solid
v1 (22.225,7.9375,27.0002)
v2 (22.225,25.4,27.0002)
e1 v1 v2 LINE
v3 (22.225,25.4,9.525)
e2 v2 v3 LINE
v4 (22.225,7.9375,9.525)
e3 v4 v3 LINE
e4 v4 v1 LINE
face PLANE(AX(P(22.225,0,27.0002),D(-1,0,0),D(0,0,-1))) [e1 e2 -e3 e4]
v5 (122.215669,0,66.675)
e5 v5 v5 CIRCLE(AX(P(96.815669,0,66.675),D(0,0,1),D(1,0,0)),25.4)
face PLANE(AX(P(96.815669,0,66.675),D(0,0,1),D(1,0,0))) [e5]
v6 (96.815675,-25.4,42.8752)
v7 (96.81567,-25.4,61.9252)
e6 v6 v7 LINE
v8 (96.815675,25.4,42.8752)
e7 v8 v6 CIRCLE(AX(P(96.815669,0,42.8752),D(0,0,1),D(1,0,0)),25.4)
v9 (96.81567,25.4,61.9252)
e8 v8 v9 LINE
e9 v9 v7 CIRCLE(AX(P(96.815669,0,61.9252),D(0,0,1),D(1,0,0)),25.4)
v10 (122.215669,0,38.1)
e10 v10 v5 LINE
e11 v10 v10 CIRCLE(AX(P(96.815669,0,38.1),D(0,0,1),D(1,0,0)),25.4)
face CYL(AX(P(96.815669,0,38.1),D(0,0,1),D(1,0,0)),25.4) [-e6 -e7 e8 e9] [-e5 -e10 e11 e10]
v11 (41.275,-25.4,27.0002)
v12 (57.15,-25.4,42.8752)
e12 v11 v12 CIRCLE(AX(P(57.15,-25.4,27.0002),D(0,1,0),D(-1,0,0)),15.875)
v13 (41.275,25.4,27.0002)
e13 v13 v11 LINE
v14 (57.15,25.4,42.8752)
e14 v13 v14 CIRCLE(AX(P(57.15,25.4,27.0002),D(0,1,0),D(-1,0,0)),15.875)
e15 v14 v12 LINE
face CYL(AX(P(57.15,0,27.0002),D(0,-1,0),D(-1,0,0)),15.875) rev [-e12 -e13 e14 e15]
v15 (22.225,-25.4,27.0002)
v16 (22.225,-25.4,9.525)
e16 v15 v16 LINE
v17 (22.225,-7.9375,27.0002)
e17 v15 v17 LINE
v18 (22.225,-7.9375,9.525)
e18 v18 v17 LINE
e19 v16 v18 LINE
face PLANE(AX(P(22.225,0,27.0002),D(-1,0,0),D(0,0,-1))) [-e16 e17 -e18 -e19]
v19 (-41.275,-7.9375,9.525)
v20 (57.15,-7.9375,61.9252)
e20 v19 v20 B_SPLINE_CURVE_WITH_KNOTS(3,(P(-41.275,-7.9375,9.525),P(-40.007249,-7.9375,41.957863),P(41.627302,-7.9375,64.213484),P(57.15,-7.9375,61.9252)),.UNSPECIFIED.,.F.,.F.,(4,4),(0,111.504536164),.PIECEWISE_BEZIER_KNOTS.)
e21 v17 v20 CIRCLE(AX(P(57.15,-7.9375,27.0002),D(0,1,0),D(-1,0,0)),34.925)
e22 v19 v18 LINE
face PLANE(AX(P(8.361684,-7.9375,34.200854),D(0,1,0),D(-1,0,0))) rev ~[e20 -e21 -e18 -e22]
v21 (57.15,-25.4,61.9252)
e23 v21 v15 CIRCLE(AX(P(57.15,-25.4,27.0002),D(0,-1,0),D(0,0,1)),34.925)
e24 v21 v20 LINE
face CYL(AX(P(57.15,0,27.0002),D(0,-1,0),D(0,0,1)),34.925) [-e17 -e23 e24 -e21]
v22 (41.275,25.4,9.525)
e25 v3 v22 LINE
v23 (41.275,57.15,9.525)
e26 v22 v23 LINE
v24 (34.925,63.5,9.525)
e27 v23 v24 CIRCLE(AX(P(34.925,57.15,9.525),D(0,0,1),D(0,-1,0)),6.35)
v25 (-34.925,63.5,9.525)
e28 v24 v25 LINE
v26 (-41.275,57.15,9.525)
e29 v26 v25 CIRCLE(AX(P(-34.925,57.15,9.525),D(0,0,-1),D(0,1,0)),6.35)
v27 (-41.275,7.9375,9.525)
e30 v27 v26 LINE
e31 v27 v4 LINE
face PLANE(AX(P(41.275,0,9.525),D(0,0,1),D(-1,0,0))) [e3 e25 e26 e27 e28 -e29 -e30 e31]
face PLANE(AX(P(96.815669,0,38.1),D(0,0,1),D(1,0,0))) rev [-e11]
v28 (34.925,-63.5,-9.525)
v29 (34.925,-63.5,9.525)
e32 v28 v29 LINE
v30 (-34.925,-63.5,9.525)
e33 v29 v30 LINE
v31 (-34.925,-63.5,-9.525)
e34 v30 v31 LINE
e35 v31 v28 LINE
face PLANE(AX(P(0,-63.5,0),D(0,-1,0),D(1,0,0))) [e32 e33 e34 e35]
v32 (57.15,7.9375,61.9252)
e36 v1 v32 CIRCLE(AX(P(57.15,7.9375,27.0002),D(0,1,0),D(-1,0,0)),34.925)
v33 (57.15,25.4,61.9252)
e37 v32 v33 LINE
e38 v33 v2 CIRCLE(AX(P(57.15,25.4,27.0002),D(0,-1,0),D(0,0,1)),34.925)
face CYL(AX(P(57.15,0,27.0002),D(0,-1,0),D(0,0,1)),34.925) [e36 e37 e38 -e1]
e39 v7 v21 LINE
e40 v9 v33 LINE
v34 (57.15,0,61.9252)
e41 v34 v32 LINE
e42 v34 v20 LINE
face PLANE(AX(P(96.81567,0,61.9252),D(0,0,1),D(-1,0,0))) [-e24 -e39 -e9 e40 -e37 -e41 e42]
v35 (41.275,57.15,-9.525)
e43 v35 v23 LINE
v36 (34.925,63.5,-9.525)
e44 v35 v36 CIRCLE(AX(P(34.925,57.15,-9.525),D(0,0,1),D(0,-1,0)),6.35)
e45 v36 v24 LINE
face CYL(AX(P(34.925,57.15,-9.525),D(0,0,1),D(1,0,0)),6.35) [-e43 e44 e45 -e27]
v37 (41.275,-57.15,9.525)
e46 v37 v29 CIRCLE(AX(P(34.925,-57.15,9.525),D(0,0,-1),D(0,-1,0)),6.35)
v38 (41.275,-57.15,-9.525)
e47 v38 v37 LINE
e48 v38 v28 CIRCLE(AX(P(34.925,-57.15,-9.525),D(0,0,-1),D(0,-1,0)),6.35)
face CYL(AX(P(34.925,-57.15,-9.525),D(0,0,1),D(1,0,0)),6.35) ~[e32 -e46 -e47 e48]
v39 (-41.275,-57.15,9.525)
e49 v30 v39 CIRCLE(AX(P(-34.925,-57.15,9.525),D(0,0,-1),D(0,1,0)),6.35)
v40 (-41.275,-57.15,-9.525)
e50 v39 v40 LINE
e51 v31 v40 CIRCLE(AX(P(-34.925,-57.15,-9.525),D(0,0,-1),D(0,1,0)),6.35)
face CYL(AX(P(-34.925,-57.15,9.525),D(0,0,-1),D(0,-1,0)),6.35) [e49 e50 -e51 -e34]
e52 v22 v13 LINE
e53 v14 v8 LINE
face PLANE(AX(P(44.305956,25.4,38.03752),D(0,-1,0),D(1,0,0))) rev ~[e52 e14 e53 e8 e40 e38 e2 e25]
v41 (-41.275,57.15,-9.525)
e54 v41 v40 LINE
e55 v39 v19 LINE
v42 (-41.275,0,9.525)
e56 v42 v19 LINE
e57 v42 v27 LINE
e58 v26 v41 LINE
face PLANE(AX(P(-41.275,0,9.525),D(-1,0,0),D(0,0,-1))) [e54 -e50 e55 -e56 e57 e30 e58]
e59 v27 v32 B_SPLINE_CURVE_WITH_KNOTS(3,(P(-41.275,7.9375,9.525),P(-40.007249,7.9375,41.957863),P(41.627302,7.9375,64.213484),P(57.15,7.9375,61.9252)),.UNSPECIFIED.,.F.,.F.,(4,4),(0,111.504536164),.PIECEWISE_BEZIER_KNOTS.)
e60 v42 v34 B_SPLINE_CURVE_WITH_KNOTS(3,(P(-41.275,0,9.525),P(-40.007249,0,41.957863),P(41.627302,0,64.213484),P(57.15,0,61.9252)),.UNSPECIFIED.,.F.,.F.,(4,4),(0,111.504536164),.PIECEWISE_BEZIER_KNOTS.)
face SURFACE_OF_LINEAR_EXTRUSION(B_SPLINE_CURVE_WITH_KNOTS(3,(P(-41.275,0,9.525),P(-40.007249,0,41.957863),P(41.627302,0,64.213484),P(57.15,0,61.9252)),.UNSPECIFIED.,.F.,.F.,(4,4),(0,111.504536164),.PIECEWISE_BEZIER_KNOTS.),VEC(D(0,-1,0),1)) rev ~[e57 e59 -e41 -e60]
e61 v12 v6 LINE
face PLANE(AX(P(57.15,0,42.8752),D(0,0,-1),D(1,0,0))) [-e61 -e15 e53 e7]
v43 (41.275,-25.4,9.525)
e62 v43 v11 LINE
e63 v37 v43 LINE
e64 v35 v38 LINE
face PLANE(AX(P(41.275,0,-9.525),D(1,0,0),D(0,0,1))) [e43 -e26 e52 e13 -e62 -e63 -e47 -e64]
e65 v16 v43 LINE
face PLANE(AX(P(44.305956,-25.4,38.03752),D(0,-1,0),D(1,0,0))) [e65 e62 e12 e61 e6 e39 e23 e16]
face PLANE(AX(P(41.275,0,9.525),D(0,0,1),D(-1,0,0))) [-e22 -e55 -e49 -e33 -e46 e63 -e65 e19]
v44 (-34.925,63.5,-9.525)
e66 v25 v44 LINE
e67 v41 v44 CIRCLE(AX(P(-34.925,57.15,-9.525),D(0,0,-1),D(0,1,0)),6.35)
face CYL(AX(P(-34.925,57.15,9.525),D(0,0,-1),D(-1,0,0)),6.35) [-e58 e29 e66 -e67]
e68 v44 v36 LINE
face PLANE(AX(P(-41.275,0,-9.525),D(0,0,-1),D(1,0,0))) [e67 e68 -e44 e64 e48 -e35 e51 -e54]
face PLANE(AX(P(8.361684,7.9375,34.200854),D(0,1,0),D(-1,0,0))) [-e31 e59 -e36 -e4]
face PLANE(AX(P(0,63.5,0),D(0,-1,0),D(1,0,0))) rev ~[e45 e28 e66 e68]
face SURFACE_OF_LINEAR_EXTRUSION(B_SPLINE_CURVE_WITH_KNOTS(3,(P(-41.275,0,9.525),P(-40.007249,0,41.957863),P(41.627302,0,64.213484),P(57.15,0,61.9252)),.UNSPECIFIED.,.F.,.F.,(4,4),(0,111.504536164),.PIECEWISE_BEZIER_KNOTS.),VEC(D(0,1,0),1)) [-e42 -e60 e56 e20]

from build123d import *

# Parameters (mm, degrees)
F1_DEPTH = 63.5
F2_DEPTH = 25.4
F3_DEPTH = 7.9375
F5_R     = 6.35


# Not quite as in the source:
# - ends of sketch curves that miss each other by under 0.0002 mm in the source are joined
# - a feature names something its author has since deleted; it is built from what else it names


with BuildPart() as f1:
    # F0 (on Front) → F1 (new body, symmetric)
    with BuildSketch(Plane.XZ):
        Polygon((-41.275, 9.525), (-41.275, -9.525), (41.275, -9.525), (41.275, 9.525), (22.225, 9.525), align=None)
    extrude(amount=F1_DEPTH, both=True)

    # F0 (on Front) → F2 (join, symmetric)
    with BuildSketch(Plane.XZ):
        with BuildLine():
            Line((22.225, 9.525), (41.275, 9.525))
            Line((41.275, 9.525), (41.275, 27.0002))
            ThreePointArc((41.275, 27.0002), (45.9246798487, 38.2255201513), (57.15, 42.8752))
            Line((57.15, 42.8752), (71.4156685244, 42.8752))
            Line((71.4156685244, 42.8752), (71.4156685244, 61.9252))
            Line((71.4156685244, 61.9252), (57.15, 61.9252))
            ThreePointArc((57.15, 61.9252), (32.4542956671, 51.6959043329), (22.225, 27.0002))
            Line((22.225, 27.0002), (22.225, 9.525))
        make_face()
        Polygon((96.8156695652, 61.9252), (71.4156685244, 61.9252), (71.4156685244, 42.8752), (96.8156754971, 42.8752), align=None)
    extrude(amount=F2_DEPTH, both=True)

    # F0 (on Front) → F3 (join, symmetric)
    with BuildSketch(Plane.XZ):
        with BuildLine():
            add(Edge.make_bspline(
                [(-41.275, 9.525), (-40.0072485209, 41.9578626752), (41.6273023615, 64.213483679), (57.15, 61.9252)],
                knots=[0, 0, 0, 0, 111.5045361635, 111.5045361635, 111.5045361635, 111.5045361635], degree=3))
            Line((-41.275, 9.525), (22.225, 9.525))
            Line((22.225, 9.525), (22.225, 27.0002))
            ThreePointArc((22.225, 27.0002), (32.4542956671, 51.6959043329), (57.15, 61.9252))
        make_face()
    extrude(amount=F3_DEPTH, both=True)

    # F0 (on Front) → F4 (revolve)
    with BuildSketch(Plane.XZ):
        Polygon((96.8156685244, 66.675), (96.8156685244, 61.9252), (96.8156685244, 42.8752), (96.8156685244, 38.1), (122.2156685244, 38.1), (122.2156685244, 66.675), align=None)
    revolve(axis=Axis((96.8156685244, 0, 52.3875), (0, 0, 1)))

    # F5
    f5_edges = [f1.edges().sort_by_distance(p)[0] for p in [
        (-41.275, -63.5, 0),
        (-41.275, 63.5, 0),
        (41.275, 63.5, 0),
        (41.275, -63.5, 0),
    ]]
    fillet(f5_edges, radius=F5_R)


solid = f1.part
